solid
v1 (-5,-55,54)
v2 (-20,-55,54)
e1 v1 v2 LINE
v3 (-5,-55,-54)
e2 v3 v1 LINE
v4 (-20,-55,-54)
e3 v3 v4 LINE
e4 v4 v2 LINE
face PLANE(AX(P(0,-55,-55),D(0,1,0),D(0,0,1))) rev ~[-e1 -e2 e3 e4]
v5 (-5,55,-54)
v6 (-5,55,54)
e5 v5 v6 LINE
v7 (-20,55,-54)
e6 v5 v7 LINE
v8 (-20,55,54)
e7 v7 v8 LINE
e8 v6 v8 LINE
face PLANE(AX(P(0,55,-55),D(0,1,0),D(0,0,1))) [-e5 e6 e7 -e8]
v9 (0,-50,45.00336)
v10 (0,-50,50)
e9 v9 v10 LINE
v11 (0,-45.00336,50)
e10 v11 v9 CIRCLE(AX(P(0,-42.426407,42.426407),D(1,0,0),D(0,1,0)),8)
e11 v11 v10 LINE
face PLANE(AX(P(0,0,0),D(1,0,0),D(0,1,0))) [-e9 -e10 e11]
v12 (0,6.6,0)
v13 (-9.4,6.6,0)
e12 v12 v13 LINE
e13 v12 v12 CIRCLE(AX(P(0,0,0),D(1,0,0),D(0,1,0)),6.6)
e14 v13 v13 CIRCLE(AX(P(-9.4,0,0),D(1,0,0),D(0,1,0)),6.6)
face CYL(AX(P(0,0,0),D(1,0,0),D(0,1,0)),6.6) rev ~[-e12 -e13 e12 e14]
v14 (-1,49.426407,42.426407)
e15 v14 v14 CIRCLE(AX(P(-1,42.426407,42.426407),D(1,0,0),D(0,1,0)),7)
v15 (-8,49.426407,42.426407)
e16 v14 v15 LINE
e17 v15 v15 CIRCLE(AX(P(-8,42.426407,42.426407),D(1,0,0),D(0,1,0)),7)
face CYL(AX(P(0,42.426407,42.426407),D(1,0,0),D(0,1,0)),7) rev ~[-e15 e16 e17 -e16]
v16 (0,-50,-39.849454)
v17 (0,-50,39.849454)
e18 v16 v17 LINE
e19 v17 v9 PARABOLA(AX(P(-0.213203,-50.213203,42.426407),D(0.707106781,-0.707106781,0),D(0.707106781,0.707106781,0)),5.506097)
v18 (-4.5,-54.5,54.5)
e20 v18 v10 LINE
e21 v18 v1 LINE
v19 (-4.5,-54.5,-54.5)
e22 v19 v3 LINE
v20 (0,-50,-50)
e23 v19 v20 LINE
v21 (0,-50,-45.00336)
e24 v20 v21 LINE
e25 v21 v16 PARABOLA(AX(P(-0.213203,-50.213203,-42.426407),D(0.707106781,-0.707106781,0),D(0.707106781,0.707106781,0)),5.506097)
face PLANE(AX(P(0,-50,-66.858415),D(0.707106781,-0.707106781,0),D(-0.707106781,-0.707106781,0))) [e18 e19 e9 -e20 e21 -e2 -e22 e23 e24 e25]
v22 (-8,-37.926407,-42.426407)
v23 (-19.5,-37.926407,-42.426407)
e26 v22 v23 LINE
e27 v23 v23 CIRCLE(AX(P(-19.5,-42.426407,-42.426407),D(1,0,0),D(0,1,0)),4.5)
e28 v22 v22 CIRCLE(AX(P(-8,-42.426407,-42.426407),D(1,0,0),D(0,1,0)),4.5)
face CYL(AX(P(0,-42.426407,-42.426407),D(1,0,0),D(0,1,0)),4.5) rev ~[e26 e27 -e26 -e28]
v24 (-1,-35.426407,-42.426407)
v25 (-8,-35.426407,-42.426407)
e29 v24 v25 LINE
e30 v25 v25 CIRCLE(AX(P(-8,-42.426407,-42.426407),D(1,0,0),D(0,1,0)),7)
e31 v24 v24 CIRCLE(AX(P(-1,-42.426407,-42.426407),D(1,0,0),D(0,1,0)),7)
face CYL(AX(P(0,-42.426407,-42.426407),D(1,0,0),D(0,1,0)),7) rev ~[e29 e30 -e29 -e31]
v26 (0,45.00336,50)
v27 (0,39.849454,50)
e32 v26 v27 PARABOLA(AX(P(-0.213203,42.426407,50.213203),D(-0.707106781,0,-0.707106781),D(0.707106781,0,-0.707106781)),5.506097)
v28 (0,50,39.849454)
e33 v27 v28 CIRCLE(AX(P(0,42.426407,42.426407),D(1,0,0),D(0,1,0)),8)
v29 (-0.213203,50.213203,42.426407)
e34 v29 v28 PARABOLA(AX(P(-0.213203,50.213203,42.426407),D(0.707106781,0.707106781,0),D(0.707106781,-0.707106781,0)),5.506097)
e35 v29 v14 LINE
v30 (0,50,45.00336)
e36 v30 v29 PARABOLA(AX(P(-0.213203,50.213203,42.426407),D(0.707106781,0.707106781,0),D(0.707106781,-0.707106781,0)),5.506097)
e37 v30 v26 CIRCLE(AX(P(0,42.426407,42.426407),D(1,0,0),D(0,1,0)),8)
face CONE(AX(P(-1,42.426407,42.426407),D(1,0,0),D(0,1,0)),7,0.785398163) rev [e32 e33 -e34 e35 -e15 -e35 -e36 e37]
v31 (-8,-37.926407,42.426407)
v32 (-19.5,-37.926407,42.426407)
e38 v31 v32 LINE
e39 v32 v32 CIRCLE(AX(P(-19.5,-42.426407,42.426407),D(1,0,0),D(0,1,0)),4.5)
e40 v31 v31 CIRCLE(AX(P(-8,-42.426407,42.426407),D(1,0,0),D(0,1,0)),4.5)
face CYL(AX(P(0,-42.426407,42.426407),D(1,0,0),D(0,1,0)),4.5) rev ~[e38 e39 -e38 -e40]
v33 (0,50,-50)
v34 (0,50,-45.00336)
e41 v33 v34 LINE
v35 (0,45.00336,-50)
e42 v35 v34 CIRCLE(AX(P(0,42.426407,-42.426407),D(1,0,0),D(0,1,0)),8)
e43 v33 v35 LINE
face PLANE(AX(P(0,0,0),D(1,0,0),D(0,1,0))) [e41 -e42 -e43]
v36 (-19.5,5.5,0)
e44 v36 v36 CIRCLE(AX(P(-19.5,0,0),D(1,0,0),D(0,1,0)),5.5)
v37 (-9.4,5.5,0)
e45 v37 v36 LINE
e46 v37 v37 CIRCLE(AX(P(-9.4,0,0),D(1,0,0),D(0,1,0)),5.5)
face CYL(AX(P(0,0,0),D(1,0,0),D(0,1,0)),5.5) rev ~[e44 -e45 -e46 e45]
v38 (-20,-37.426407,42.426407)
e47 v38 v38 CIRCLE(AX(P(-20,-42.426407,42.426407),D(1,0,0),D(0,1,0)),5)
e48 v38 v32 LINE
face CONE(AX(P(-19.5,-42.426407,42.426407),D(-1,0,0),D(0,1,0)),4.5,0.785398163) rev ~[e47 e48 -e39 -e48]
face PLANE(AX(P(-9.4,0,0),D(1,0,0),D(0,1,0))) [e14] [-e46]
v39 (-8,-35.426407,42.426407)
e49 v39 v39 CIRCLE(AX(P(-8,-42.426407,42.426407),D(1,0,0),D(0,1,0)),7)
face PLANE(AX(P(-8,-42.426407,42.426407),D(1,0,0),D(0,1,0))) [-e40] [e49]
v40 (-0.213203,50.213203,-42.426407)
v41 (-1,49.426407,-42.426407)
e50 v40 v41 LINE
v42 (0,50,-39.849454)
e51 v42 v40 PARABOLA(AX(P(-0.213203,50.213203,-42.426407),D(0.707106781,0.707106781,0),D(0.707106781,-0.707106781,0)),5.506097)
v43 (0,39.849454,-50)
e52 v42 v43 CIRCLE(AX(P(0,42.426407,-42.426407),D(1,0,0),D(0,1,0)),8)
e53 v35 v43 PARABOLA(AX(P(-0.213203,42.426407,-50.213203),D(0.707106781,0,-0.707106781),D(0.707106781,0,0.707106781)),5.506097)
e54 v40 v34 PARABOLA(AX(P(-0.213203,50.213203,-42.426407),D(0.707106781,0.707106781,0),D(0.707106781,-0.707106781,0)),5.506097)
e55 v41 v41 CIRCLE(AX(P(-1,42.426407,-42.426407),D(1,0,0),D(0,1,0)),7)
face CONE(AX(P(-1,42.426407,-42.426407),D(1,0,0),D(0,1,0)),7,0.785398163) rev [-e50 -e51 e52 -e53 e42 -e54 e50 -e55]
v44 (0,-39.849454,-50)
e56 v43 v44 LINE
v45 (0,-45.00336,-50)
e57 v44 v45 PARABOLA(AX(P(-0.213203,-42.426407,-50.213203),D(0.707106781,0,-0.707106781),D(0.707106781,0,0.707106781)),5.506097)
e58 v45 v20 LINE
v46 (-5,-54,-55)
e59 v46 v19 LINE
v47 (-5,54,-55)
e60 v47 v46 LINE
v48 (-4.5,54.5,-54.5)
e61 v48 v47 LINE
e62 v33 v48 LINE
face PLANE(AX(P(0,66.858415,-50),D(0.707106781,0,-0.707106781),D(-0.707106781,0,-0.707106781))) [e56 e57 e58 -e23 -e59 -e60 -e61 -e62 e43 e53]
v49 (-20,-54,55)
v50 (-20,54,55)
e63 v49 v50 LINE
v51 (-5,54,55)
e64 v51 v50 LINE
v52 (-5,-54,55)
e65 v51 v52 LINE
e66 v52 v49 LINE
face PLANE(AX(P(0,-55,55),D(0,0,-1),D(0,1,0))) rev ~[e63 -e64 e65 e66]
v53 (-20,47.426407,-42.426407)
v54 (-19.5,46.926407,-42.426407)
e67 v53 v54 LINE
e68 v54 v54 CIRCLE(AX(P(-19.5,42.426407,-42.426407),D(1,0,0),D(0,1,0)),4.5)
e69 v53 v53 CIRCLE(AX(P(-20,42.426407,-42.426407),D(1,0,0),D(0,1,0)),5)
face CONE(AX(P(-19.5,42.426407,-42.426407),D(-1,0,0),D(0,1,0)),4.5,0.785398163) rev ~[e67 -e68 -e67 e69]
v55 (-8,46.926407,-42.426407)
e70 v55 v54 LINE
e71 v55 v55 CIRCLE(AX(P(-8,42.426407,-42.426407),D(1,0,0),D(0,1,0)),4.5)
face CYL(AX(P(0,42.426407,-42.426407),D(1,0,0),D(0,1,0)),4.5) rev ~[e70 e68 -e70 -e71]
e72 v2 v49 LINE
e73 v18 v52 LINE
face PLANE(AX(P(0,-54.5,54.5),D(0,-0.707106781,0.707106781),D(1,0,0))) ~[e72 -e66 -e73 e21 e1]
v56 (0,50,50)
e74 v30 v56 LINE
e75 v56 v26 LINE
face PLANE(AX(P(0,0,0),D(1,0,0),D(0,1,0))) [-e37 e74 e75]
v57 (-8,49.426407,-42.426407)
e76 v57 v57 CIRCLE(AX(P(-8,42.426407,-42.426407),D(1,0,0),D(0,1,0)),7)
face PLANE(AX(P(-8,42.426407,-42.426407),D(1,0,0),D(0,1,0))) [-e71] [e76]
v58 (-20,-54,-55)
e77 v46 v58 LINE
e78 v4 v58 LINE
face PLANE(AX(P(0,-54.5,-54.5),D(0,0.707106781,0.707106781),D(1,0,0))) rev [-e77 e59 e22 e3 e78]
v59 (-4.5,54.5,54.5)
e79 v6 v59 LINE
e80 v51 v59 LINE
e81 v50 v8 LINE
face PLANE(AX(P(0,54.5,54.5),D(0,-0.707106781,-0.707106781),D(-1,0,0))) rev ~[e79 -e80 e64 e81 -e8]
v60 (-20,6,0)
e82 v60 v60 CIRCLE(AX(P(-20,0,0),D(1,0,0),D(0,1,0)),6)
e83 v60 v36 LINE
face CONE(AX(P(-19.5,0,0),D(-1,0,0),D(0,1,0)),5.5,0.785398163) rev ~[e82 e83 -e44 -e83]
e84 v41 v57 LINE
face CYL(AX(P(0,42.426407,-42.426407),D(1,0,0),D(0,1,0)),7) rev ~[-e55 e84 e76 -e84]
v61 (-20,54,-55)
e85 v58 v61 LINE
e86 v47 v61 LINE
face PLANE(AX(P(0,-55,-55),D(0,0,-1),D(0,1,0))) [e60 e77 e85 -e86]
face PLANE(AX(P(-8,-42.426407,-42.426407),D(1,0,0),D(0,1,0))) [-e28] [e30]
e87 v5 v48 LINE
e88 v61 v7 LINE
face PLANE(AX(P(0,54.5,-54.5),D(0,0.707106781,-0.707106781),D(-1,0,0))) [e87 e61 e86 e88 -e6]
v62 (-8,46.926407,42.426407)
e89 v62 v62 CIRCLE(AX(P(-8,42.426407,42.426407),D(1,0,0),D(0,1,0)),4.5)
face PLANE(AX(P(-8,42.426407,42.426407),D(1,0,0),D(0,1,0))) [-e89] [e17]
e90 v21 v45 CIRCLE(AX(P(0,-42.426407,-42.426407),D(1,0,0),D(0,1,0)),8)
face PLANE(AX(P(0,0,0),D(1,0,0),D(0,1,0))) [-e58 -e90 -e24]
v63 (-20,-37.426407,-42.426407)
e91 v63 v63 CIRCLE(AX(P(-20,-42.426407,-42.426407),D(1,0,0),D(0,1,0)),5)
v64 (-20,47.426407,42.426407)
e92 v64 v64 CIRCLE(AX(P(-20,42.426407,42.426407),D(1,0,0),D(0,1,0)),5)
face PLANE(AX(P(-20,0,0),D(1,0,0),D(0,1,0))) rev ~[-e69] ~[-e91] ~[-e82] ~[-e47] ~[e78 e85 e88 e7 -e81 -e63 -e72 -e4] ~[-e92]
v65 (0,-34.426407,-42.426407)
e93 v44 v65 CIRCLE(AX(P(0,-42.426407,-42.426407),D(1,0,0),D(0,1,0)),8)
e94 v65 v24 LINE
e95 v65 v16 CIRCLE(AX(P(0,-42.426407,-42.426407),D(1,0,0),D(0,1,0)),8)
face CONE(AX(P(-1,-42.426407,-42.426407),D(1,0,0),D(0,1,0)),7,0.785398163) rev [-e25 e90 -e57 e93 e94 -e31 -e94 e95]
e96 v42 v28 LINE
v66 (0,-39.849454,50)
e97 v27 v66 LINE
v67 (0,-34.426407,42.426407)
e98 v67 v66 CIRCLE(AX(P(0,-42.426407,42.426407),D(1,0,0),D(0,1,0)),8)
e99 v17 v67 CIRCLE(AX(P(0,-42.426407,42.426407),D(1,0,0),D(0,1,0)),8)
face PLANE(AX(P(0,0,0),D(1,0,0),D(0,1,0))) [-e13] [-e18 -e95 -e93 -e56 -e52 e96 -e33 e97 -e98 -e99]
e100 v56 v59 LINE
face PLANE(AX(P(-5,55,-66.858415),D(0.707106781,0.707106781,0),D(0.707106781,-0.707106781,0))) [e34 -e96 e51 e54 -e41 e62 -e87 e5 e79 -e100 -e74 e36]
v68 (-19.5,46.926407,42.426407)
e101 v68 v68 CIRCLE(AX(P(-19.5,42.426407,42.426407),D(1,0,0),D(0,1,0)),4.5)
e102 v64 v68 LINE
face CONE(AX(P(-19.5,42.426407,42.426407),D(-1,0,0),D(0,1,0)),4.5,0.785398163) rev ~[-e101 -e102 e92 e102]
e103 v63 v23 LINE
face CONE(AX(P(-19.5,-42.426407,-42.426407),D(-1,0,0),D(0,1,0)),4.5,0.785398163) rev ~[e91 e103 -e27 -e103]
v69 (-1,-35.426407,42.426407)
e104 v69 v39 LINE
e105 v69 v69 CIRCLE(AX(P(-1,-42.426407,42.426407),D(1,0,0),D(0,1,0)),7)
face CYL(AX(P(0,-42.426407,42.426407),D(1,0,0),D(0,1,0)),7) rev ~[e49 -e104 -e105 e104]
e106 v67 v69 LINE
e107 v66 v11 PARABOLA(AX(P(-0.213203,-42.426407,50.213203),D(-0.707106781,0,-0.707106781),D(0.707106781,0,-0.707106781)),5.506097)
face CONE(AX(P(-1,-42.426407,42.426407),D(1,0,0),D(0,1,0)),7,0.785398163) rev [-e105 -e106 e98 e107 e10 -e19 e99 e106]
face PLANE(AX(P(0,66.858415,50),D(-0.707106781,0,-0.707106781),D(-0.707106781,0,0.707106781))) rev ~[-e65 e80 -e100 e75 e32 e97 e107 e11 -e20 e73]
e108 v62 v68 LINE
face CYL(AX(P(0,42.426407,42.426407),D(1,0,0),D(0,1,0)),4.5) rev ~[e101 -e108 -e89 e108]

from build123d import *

# Parameters (mm, degrees)
F0_W        = 110
F0_H        = 110
F0_R        = 7
F0_R_2      = 6.6
F0_R_3      = 4.5
F0_R_4      = 5.5
F1_DEPTH    = 20
F2_DEPTH    = 20.001
F3_DEPTH    = 8
F4_DEPTH    = 9.4
F5_SIZE     = 1
F6_T1_DEPTH = 133.7168298797
F6_T3_DEPTH = 133.7168298797
F7_SIZE     = 0.5


# Not quite as in the source:
# - a fillet or chamfer that OpenCascade refuses, or shapes differently, is made with other operations: its cross-section is extruded or revolved along the edge and cut away or added


with BuildPart() as f1:
    # F0 (on Right) → F1 (new body)
    with BuildSketch(Plane.YZ):
        Rectangle(F0_W, F0_H)
        with Locations((-42.4264068712, -42.4264068712)):
            Circle(F0_R, mode=Mode.SUBTRACT)
        with Locations((42.4264068712, -42.4264068712)):
            Circle(F0_R, mode=Mode.SUBTRACT)
        with Locations((-42.4264068712, 42.4264068712)):
            Circle(F0_R, mode=Mode.SUBTRACT)
        Circle(F0_R_2, mode=Mode.SUBTRACT)
        with Locations((42.4264068712, 42.4264068712)):
            Circle(F0_R, mode=Mode.SUBTRACT)
        with Locations((-42.4264068712, 42.4264068712)):
            Circle(F0_R)
        with Locations((-42.4264068712, 42.4264068712)):
            Circle(F0_R_3, mode=Mode.SUBTRACT)
        with Locations((-42.4264068712, -42.4264068712)):
            Circle(F0_R)
        with Locations((-42.4264068712, -42.4264068712)):
            Circle(F0_R_3, mode=Mode.SUBTRACT)
        with Locations((42.4264068712, -42.4264068712)):
            Circle(F0_R)
        with Locations((42.4264068712, -42.4264068712)):
            Circle(F0_R_3, mode=Mode.SUBTRACT)
        with Locations((42.4264068712, 42.4264068712)):
            Circle(F0_R)
        with Locations((42.4264068712, 42.4264068712)):
            Circle(F0_R_3, mode=Mode.SUBTRACT)
        Circle(F0_R_2)
        Circle(F0_R_4, mode=Mode.SUBTRACT)
        Circle(F0_R_4)
        with Locations((-42.4264068712, 42.4264068712)):
            Circle(F0_R_3)
        with Locations((-42.4264068712, -42.4264068712)):
            Circle(F0_R_3)
        with Locations((42.4264068712, -42.4264068712)):
            Circle(F0_R_3)
        with Locations((42.4264068712, 42.4264068712)):
            Circle(F0_R_3)
    extrude(amount=-F1_DEPTH)

    # F0 (on Right) → F2 (cut, through all)
    with BuildSketch(Plane.YZ):
        with Locations((-42.4264068712, 42.4264068712)):
            Circle(F0_R_3)
        with Locations((42.4264068712, -42.4264068712)):
            Circle(F0_R_3)
        with Locations((-42.4264068712, -42.4264068712)):
            Circle(F0_R_3)
        Circle(F0_R_4)
        with Locations((42.4264068712, 42.4264068712)):
            Circle(F0_R_3)
    extrude(amount=-F2_DEPTH, mode=Mode.SUBTRACT)

    # F0 (on Right) → F3 (cut)
    with BuildSketch(Plane.YZ):
        with Locations((-42.4264068712, 42.4264068712)):
            Circle(F0_R)
        with Locations((-42.4264068712, 42.4264068712)):
            Circle(F0_R_3, mode=Mode.SUBTRACT)
        with Locations((42.4264068712, 42.4264068712)):
            Circle(F0_R)
        with Locations((42.4264068712, 42.4264068712)):
            Circle(F0_R_3, mode=Mode.SUBTRACT)
        with Locations((-42.4264068712, -42.4264068712)):
            Circle(F0_R)
        with Locations((-42.4264068712, -42.4264068712)):
            Circle(F0_R_3, mode=Mode.SUBTRACT)
        with Locations((42.4264068712, -42.4264068712)):
            Circle(F0_R)
        with Locations((42.4264068712, -42.4264068712)):
            Circle(F0_R_3, mode=Mode.SUBTRACT)
    extrude(amount=-F3_DEPTH, mode=Mode.SUBTRACT)

    # F0 (on Right) → F4 (cut)
    with BuildSketch(Plane.YZ):
        Circle(F0_R_2)
        Circle(F0_R_4, mode=Mode.SUBTRACT)
    extrude(amount=-F4_DEPTH, mode=Mode.SUBTRACT)

    # F5
    f5_edges = [f1.edges().sort_by_distance(p)[0] for p in [
        (0, -49.426407, 42.426407),
        (0, 35.426407, 42.426407),
        (0, -49.426407, -42.426407),
        (0, 35.426407, -42.426407),
        (-10, 55, -55),
        (-10, 55, 55),
        (-10, -55, 55),
        (-10, -55, -55),
    ]]
    chamfer(f5_edges, length=F5_SIZE)

    # F6: chamfer of 5 on 4 edges, made by hand

    # F6_s2 → F6_t1 (cut)
    with BuildSketch(Plane.XY.offset(-66.8584149398)):
        Polygon((0, -50), (-5, -55), (0, -55), align=None)
        Polygon((-5, 55), (0, 50), (0, 55), align=None)
    extrude(amount=F6_T1_DEPTH, mode=Mode.SUBTRACT)

    # F6_s4 → F6_t3 (cut)
    with BuildSketch(Plane.XZ.offset(-66.8584149398)):
        Polygon((0, 50), (-5, 55), (0, 55), align=None)
        Polygon((0, -50), (-5, -55), (0, -55), align=None)
    extrude(amount=F6_T3_DEPTH, mode=Mode.SUBTRACT)

    # F7
    f7_edges = [f1.edges().sort_by_distance(p)[0] for p in [
        (-20, 37.926407, -42.426407),
        (-20, 37.926407, 42.426407),
        (-20, -46.926407, 42.426407),
        (-20, -46.926407, -42.426407),
        (-20, -5.5, 0),
    ]]
    chamfer(f7_edges, length=F7_SIZE)


solid = f1.part
